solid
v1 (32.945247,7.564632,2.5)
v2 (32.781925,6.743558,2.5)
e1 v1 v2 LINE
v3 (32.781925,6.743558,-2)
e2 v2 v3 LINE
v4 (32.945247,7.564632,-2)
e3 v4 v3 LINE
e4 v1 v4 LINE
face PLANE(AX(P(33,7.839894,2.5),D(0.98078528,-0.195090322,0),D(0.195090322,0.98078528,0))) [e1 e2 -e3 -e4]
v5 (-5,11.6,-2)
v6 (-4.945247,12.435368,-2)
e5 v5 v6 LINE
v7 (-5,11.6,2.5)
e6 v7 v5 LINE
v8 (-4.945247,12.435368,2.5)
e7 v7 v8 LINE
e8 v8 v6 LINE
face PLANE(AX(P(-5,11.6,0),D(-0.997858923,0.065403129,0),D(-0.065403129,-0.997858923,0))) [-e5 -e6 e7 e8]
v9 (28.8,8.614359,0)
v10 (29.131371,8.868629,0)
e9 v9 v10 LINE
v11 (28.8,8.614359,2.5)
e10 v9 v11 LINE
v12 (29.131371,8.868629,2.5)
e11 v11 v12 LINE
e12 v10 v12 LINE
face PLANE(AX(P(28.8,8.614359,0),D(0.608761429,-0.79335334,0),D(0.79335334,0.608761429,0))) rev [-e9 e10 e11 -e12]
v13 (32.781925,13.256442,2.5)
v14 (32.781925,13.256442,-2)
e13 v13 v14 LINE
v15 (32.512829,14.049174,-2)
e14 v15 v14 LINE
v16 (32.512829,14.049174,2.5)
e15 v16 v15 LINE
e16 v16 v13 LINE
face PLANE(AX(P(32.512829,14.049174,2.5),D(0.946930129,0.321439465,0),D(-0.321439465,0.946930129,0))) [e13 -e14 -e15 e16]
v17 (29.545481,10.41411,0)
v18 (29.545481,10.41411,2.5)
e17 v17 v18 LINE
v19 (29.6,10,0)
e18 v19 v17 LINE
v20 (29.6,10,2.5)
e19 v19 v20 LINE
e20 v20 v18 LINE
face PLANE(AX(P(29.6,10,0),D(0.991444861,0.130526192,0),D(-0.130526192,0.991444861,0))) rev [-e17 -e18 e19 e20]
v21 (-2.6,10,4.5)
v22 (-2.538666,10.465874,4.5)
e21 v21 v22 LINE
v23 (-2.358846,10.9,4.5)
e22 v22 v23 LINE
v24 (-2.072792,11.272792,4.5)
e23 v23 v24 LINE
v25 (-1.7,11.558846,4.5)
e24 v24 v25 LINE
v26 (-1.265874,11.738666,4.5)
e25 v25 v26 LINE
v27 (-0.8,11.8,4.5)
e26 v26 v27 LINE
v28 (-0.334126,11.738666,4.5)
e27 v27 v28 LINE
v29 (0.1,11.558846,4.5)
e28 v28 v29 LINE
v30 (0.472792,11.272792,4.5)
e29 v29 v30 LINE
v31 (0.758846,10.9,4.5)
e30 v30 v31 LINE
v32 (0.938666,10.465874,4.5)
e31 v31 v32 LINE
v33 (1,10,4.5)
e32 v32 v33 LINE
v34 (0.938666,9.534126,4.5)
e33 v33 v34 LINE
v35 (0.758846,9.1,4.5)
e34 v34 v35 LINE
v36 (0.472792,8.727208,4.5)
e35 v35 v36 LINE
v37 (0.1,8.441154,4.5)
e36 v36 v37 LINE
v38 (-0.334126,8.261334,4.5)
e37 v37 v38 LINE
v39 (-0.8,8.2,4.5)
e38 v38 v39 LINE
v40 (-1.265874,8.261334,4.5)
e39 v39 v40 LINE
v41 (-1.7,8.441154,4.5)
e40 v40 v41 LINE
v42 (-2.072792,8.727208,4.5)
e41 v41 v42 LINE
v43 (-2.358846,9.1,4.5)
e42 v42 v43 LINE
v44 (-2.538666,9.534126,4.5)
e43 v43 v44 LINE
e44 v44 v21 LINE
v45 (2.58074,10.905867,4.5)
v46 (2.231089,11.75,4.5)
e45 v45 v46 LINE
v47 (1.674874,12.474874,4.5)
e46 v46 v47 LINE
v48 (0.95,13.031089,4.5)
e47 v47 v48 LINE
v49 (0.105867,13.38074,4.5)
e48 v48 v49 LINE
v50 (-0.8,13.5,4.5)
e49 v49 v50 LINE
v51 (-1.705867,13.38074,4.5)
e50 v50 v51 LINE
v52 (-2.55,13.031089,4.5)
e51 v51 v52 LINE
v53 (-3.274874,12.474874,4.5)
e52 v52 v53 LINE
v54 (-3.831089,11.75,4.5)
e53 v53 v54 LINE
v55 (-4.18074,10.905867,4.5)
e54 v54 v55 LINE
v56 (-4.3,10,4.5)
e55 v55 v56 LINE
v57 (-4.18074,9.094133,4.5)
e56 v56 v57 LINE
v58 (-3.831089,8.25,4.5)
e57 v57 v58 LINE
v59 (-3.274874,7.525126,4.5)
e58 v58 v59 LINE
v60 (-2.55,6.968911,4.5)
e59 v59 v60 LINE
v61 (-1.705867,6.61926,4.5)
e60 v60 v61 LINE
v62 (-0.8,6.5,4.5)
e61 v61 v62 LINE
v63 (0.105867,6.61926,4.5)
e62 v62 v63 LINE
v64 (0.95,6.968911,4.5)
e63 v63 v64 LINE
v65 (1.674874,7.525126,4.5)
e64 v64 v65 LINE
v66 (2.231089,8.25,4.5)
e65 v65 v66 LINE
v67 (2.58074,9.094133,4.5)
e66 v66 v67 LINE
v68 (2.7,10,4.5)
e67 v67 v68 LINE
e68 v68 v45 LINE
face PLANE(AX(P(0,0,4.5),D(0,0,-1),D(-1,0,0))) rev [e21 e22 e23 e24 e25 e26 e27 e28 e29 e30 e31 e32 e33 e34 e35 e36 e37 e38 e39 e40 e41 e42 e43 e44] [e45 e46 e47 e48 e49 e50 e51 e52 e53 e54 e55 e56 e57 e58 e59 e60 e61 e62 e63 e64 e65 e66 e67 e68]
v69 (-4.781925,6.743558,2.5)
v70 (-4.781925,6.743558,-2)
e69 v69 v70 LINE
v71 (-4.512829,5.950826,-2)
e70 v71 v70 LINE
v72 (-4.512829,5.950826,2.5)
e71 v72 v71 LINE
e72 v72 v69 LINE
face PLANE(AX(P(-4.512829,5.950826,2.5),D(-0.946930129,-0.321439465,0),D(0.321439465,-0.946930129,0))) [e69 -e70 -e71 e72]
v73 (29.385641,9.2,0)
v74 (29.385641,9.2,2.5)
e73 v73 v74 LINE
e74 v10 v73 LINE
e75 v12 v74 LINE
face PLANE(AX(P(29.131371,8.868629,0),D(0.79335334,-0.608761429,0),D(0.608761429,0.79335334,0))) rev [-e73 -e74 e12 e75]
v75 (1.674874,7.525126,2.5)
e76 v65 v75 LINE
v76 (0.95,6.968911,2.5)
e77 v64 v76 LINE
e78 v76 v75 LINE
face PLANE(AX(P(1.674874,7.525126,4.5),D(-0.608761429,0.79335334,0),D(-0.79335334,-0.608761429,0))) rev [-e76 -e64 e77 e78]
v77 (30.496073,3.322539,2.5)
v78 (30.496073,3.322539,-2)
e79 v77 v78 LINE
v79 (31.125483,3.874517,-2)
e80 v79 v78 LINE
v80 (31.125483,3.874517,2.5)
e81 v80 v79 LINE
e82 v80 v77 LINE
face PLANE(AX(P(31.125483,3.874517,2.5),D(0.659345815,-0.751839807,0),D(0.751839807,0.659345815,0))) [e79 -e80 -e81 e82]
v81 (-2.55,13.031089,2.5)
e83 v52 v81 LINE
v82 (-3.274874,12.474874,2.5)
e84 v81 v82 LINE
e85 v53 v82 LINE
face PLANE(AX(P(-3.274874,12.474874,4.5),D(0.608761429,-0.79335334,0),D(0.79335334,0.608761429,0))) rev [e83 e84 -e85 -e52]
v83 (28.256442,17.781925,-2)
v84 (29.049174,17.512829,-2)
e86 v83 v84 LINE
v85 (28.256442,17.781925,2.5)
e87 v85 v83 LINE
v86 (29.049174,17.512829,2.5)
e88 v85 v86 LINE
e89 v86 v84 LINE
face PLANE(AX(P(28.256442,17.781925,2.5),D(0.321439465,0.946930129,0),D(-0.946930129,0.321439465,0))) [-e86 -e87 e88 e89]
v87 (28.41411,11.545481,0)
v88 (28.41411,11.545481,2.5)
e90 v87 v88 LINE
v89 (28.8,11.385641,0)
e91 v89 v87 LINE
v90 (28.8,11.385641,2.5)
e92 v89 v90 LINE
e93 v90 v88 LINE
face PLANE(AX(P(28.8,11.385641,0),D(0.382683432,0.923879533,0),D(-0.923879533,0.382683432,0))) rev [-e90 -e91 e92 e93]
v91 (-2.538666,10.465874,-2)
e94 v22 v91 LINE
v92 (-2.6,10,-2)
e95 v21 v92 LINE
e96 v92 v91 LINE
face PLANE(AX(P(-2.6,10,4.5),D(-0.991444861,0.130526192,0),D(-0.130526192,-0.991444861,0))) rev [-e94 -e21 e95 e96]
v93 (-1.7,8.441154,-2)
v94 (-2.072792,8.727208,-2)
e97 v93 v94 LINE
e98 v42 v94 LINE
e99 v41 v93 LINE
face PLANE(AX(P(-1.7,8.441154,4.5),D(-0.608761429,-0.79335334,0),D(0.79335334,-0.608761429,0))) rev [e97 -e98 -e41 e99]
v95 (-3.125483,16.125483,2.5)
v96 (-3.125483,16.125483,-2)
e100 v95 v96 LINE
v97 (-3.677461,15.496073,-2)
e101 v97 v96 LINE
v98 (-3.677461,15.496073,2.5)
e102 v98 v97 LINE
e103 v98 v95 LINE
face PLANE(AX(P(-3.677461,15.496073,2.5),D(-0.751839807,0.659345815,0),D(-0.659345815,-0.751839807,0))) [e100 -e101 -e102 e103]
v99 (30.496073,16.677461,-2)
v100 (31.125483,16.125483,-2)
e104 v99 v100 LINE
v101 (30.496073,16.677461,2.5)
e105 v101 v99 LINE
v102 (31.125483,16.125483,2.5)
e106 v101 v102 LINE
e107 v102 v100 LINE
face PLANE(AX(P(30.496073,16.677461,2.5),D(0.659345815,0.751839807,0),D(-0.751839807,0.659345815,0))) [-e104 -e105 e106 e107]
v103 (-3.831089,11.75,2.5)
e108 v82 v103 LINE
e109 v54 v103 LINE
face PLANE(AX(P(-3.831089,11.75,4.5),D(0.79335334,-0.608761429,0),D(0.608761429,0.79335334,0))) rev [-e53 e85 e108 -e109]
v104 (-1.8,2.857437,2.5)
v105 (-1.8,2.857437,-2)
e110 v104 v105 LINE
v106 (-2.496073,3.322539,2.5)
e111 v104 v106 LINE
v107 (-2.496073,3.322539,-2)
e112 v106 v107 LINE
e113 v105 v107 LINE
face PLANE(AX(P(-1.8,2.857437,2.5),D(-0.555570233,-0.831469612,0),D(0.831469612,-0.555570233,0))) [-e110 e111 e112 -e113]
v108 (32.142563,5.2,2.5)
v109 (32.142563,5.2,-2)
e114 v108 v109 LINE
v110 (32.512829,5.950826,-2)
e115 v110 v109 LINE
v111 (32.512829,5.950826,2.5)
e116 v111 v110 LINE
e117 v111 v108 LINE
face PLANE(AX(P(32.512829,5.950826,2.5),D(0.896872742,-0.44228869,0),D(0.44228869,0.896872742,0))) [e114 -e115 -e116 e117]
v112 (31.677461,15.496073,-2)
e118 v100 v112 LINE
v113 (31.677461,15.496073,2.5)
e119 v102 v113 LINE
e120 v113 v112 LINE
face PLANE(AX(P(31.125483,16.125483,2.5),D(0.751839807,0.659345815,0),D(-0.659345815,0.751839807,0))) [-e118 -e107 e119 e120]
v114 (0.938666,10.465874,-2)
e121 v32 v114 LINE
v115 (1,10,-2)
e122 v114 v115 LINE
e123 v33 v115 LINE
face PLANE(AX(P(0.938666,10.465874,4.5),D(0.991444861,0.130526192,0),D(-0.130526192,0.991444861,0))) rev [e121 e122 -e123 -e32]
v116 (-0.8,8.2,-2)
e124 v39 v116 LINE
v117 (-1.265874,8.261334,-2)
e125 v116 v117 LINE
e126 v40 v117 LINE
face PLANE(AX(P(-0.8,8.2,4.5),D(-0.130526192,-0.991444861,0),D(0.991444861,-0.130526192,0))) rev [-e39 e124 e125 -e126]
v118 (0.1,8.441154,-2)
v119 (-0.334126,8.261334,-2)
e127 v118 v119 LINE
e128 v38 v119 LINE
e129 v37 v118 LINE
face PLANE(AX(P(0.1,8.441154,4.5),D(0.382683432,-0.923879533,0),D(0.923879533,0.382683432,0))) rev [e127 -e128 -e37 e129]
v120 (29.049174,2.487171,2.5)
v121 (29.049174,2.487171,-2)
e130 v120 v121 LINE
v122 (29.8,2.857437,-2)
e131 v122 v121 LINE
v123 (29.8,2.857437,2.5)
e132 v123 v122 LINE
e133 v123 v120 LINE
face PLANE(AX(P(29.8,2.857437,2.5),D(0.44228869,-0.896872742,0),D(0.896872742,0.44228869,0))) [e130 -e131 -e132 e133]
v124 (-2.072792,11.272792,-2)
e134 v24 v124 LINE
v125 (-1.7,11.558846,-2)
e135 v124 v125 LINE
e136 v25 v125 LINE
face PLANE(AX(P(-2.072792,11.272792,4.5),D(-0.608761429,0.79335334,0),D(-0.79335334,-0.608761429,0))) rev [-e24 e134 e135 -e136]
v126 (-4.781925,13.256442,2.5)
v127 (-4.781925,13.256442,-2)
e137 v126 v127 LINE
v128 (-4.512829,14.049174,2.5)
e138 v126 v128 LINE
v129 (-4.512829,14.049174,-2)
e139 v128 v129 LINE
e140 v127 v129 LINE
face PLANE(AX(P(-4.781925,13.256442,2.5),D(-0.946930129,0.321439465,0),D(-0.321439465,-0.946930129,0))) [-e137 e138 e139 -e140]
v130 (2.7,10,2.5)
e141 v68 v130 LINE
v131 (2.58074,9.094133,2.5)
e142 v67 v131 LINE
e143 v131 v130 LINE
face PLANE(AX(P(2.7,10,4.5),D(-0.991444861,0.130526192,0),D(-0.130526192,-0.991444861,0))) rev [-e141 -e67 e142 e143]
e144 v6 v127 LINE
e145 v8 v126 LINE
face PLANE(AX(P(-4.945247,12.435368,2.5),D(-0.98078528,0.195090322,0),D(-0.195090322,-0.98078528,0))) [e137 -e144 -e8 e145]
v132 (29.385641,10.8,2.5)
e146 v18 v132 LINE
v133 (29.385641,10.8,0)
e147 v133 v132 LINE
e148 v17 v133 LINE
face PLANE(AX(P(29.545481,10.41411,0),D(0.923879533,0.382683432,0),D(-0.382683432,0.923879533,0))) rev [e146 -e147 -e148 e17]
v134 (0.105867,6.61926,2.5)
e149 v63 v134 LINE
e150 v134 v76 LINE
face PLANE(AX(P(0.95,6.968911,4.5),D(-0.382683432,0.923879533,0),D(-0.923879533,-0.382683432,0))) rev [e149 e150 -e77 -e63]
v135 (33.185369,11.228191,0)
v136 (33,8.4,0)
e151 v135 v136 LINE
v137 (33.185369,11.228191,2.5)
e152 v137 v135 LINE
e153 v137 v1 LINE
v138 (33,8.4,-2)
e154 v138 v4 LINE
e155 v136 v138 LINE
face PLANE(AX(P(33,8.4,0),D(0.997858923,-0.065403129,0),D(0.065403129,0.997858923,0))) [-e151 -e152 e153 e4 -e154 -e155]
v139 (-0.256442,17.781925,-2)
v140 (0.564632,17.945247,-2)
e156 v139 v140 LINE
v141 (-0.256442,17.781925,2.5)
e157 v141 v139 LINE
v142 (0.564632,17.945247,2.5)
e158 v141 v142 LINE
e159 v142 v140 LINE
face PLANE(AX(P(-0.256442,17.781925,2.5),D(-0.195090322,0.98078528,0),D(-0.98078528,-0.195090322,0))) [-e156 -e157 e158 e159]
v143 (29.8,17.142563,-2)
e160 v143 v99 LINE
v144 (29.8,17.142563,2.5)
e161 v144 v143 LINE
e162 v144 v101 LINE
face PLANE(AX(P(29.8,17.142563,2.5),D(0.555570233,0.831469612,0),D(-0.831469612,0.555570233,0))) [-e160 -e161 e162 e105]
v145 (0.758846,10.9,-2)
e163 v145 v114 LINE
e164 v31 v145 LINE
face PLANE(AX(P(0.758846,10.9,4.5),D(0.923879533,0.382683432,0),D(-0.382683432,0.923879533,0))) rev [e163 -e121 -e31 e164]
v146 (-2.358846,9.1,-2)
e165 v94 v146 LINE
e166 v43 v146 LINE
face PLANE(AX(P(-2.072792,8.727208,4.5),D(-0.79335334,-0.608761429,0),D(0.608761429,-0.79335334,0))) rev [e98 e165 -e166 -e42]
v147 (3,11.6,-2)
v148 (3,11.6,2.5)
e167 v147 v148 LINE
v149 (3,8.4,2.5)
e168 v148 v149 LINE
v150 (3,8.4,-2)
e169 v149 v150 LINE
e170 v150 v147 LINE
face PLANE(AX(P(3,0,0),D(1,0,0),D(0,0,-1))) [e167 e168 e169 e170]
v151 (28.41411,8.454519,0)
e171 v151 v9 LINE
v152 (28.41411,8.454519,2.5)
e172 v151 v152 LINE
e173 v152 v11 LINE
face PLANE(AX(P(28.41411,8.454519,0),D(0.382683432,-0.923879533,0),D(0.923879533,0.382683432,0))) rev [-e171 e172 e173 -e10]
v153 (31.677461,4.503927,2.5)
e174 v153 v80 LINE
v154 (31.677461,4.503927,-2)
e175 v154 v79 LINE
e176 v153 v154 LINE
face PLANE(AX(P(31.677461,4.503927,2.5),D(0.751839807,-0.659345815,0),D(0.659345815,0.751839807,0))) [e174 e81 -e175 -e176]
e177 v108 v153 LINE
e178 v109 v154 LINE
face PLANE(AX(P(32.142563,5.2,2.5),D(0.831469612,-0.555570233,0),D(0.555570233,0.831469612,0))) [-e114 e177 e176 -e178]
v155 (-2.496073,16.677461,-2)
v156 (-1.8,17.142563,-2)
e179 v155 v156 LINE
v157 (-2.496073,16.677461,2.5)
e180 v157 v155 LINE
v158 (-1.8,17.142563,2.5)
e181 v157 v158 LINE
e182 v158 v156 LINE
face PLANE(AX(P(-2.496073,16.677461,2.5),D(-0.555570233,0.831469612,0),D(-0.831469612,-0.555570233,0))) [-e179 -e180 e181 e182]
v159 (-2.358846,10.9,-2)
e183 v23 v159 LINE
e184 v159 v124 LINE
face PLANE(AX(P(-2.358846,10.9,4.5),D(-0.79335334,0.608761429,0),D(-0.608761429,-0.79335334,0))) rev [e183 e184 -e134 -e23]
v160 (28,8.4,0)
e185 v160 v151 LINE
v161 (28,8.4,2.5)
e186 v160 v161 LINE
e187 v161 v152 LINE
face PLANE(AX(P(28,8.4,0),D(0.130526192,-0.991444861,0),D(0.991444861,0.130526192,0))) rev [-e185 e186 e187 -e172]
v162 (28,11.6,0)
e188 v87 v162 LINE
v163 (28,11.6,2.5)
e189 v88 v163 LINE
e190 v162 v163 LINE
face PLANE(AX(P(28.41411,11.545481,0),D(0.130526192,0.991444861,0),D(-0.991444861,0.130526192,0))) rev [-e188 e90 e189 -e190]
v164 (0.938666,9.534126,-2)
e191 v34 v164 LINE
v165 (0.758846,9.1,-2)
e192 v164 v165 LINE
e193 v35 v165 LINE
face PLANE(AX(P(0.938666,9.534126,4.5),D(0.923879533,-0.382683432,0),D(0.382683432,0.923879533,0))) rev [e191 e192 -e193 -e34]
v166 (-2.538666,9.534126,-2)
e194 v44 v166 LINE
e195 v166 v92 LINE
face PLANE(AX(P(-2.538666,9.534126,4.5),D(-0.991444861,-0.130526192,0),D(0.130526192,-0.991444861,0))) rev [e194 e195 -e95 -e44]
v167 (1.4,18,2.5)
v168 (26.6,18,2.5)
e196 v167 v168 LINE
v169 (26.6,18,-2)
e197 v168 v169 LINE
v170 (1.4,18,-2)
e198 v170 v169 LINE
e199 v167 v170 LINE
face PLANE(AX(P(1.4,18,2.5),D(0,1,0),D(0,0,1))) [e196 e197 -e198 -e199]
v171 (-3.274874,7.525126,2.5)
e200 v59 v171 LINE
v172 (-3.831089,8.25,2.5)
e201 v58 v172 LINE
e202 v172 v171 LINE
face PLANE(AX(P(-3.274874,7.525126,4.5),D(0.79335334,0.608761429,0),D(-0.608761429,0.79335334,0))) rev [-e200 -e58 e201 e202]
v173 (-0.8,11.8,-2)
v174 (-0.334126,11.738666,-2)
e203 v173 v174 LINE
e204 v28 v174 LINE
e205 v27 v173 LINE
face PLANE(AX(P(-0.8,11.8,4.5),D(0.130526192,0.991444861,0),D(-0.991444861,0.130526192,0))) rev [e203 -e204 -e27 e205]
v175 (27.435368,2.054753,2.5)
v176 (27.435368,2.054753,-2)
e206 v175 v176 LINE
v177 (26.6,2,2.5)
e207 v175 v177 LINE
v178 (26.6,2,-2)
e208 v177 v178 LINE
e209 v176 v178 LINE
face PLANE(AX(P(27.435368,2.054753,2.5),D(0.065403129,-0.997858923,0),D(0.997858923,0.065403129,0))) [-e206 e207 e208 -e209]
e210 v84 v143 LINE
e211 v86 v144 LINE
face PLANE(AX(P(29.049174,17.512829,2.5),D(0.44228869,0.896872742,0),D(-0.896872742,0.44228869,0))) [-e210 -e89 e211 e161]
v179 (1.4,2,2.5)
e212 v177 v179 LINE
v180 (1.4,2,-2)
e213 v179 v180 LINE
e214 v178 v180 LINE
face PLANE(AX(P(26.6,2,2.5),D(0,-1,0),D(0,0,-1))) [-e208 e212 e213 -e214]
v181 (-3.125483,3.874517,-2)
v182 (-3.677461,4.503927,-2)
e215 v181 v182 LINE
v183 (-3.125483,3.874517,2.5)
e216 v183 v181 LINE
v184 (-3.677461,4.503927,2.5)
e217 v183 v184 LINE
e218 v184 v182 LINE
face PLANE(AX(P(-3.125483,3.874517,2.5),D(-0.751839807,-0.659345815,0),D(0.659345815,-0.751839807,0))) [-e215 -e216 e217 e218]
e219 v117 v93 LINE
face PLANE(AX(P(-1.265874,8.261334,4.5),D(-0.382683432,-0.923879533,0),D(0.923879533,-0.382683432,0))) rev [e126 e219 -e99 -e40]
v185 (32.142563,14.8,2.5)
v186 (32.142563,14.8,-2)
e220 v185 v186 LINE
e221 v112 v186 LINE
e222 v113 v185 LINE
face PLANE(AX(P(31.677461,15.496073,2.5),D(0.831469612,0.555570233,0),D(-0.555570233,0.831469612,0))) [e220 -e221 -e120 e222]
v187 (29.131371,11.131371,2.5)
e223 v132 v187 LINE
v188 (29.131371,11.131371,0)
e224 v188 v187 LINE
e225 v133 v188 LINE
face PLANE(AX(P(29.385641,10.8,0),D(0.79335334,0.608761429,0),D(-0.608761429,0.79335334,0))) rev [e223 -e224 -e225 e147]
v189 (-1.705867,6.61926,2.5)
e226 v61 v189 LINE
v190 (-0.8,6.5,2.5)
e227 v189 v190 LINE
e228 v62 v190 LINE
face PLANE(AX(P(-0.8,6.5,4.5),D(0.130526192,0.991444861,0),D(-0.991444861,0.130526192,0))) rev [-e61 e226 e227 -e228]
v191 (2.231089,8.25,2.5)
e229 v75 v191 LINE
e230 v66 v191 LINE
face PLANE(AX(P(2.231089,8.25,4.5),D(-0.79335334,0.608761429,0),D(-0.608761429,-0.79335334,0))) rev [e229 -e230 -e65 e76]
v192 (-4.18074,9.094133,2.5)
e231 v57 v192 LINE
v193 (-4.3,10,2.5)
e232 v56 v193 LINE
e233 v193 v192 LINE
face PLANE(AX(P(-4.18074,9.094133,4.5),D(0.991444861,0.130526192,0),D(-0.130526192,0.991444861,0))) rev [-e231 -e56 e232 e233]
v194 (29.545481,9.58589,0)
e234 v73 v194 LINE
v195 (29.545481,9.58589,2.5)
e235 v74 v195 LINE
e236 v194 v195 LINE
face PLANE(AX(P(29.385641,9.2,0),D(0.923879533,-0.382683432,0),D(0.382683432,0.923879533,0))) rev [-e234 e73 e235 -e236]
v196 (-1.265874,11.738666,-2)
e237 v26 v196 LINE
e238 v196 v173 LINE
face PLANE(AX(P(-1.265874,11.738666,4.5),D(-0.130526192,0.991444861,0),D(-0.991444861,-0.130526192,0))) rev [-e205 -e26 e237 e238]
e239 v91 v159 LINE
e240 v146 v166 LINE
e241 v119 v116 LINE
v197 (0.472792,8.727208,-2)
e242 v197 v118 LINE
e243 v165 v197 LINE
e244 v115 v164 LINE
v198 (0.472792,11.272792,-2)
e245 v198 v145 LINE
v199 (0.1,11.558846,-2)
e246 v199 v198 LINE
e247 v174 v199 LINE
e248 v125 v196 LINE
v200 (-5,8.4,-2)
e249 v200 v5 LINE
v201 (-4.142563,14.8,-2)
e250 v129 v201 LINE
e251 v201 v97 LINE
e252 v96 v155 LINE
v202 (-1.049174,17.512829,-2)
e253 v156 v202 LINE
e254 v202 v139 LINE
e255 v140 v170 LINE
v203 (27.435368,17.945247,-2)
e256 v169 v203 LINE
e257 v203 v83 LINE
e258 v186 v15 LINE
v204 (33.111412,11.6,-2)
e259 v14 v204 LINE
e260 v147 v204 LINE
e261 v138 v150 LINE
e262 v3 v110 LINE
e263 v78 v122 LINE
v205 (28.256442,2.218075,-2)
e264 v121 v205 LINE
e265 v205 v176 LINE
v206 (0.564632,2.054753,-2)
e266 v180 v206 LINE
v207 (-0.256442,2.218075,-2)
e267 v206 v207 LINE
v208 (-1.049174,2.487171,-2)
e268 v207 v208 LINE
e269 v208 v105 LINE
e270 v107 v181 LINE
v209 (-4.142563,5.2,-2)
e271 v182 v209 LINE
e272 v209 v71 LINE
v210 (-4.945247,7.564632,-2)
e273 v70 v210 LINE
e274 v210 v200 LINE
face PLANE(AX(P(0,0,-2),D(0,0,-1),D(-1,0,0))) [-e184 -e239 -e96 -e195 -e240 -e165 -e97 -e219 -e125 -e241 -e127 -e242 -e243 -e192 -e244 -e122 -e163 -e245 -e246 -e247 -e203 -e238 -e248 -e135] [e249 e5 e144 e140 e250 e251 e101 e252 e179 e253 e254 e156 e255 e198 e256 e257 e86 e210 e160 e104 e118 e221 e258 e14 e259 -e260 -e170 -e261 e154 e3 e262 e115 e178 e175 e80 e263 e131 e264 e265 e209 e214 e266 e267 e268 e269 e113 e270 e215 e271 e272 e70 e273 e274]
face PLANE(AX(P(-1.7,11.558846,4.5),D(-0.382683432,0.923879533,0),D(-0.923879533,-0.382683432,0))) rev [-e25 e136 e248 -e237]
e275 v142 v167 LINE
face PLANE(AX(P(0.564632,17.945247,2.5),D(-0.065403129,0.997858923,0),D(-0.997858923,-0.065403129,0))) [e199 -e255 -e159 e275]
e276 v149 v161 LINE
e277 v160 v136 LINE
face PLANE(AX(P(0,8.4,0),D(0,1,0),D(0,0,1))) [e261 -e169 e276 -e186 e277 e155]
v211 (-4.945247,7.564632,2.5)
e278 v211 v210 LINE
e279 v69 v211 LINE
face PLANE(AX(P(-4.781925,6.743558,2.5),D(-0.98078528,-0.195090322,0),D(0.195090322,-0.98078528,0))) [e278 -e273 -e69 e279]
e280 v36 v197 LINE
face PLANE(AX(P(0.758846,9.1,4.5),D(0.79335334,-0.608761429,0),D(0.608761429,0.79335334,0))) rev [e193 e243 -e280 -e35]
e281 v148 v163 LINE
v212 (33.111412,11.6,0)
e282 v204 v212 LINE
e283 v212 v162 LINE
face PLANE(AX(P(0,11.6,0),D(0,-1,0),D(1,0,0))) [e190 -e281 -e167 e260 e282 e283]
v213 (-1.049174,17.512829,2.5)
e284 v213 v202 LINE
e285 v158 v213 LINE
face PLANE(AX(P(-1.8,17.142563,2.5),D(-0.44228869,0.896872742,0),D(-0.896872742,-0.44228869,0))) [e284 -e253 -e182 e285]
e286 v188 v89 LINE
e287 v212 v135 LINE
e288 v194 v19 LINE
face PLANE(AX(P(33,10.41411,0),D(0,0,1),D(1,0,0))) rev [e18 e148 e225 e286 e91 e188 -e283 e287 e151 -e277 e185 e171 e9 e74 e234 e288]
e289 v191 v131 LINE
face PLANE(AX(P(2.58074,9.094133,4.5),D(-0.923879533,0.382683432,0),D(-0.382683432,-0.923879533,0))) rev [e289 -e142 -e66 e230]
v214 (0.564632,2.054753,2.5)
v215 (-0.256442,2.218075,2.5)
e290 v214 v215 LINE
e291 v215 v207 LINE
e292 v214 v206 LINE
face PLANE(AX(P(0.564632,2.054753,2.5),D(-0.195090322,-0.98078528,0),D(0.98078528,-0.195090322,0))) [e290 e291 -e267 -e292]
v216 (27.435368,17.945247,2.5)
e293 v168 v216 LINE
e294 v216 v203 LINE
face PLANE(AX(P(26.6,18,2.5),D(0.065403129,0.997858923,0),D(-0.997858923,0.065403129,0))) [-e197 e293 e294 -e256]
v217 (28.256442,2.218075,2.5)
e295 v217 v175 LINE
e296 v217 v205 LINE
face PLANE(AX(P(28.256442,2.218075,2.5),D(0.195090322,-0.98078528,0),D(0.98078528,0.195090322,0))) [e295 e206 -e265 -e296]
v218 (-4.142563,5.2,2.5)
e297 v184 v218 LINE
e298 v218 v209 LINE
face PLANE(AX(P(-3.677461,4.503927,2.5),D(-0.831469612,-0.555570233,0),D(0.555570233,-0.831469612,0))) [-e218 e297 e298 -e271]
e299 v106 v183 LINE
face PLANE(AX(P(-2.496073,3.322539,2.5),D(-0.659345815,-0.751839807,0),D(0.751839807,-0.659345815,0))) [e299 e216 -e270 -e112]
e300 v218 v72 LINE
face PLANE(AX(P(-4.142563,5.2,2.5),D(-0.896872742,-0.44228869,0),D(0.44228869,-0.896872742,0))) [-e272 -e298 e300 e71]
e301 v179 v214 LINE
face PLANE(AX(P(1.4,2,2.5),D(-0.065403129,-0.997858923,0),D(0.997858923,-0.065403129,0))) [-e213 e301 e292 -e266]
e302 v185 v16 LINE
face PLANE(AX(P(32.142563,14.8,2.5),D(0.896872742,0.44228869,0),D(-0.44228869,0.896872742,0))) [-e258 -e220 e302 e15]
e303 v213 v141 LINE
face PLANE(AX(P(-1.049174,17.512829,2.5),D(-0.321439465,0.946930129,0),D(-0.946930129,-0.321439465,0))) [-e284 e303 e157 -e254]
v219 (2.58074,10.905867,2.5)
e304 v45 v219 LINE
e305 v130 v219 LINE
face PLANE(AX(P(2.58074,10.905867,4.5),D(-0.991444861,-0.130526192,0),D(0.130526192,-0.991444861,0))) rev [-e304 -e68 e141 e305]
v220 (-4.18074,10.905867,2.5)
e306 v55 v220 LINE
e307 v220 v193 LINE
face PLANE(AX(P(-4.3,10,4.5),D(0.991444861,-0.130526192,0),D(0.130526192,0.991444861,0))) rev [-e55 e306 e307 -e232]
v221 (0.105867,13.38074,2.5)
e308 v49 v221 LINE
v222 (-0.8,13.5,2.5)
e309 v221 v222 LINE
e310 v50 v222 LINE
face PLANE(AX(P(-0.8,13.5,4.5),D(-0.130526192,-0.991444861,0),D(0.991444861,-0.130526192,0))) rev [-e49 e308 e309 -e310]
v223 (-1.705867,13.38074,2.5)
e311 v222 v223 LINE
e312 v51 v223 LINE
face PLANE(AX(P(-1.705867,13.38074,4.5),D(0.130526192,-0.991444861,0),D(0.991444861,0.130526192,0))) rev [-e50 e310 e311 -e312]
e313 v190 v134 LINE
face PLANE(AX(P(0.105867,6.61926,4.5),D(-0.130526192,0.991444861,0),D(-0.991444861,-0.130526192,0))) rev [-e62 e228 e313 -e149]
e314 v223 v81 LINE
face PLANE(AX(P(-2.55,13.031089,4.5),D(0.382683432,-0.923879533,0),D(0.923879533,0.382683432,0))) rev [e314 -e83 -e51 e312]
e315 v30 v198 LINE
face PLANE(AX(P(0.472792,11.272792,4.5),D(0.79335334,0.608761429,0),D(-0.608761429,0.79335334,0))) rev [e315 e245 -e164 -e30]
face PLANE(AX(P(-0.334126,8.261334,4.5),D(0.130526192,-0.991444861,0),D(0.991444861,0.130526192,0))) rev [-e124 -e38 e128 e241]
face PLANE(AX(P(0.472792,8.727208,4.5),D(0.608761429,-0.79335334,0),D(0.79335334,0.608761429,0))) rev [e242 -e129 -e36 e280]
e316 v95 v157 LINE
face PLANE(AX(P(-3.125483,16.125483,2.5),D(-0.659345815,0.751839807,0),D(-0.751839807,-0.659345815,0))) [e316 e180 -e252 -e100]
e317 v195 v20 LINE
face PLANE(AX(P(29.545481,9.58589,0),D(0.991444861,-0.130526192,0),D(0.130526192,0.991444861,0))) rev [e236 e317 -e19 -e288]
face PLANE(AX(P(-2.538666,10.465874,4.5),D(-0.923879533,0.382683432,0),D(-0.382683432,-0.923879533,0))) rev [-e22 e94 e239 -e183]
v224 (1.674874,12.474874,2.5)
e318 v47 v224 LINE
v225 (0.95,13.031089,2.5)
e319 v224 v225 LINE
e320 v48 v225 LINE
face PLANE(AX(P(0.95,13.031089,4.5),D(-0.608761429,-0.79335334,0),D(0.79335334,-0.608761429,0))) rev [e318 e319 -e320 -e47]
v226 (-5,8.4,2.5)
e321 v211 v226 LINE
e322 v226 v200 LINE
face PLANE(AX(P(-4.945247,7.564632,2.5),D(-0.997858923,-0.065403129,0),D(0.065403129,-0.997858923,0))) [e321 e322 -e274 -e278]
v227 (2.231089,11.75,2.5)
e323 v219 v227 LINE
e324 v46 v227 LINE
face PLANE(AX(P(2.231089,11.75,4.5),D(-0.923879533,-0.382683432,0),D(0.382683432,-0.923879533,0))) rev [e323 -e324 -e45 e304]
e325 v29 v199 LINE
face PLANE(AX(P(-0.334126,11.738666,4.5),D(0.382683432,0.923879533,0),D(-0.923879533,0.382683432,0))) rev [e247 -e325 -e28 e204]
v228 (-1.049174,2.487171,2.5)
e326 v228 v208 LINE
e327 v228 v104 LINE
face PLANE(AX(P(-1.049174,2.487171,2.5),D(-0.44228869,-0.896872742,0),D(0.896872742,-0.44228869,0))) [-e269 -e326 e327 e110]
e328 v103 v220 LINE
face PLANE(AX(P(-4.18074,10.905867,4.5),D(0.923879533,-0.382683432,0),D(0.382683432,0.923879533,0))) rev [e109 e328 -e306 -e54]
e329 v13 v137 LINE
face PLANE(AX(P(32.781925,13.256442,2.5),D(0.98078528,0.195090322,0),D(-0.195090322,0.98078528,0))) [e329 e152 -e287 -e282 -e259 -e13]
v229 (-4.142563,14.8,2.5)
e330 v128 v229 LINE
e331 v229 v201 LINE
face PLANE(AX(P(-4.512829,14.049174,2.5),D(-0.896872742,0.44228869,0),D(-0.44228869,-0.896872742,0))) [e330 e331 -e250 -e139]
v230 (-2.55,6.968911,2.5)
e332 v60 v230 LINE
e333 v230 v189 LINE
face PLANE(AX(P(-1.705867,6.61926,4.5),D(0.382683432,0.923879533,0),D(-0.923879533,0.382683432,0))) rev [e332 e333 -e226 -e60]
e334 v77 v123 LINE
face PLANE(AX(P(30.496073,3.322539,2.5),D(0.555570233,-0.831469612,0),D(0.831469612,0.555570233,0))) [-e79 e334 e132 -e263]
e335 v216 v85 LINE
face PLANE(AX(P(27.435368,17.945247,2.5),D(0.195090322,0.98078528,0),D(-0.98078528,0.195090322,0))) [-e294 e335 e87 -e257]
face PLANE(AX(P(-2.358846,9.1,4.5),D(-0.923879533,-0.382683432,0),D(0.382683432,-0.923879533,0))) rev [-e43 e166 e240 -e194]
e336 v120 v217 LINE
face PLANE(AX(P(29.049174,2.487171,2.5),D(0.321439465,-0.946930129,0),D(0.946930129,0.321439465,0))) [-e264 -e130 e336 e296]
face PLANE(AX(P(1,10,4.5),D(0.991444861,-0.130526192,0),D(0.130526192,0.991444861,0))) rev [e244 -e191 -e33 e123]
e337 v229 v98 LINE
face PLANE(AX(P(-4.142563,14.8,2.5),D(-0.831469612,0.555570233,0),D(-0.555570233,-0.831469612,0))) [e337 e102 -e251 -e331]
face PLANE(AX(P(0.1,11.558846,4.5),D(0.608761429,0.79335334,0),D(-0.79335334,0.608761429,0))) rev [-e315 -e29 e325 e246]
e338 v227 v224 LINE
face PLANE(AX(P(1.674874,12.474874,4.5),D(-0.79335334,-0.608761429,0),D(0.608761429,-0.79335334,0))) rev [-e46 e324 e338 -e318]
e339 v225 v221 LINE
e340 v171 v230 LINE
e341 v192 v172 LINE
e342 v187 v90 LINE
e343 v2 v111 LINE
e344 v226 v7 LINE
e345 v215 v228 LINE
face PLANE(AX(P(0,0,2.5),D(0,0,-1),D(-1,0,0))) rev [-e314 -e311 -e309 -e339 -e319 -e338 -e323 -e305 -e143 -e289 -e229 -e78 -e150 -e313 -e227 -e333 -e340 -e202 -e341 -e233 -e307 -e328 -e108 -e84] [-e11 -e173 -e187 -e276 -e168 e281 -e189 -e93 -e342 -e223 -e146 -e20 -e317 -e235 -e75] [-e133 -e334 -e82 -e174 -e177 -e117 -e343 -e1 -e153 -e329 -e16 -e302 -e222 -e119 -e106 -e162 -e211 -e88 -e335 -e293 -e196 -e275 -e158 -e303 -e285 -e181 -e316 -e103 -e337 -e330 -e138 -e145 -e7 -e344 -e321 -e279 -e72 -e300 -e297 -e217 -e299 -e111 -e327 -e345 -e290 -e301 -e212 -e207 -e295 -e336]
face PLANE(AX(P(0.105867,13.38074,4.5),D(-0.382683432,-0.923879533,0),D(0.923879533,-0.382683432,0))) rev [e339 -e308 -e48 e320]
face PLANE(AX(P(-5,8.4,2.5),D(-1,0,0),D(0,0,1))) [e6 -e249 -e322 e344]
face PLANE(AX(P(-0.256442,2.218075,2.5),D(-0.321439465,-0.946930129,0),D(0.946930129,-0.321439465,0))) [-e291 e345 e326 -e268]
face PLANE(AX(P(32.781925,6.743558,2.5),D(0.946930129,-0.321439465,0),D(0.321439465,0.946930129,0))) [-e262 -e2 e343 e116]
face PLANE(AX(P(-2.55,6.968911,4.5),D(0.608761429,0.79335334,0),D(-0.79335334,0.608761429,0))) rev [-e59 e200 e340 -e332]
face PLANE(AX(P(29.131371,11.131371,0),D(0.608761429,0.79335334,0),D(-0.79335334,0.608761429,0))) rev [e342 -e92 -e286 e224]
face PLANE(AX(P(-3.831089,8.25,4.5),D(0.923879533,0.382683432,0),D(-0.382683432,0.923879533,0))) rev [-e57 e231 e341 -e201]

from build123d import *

# Parameters (mm, degrees)
BOSS_EXTRUDE1_DEPTH = 4.5
CUT_EXTRUDE1_DEPTH  = 2.5
CUT_EXTRUDE2_DEPTH  = 0.414110472
CUT_EXTRUDE3_DEPTH  = 0.414110472
CUT_EXTRUDE4_DEPTH  = 0.385889528
CUT_EXTRUDE5_DEPTH  = 0.385889528
CUT_EXTRUDE6_DEPTH  = 0.33137085
CUT_EXTRUDE7_DEPTH  = 0.33137085
CUT_EXTRUDE8_DEPTH  = 0.254269796
SKETCH10_W          = 5
SKETCH10_H          = 2
CUT_EXTRUDE9_DEPTH  = 0.214359354
CUT_EXTRUDE10_DEPTH = 0.254269796
SKETCH12_W          = 5
SKETCH12_H          = 2
CUT_EXTRUDE11_DEPTH = 0.214359354
SKETCH13_W          = 4.5
SKETCH13_H          = 3.2
CUT_EXTRUDE12_DEPTH = 25
BOSS_EXTRUDE2_DEPTH = 2
CUT_EXTRUDE13_DEPTH = 39.14773912
DRAFT1_START        = -2
DRAFT1_DEPTH        = 4.5
DRAFT1_2_DEPTH      = 2.5
DRAFT1_3_DEPTH      = 2


# Read off the part's stored shape, not the designer's step: Draft1
with BuildPart() as part:
    # Sketch1 → Boss-Extrude1 (new body)
    with BuildSketch(Plane(origin=(0, 0, -2), x_dir=(-1, 0, 0), z_dir=(0, 0, -1))):
        Polygon((-33, 12.160106278), (-33, 7.839893722), (-32.781925288, 6.743558111), (-32.512829008, 5.950826033), (-32.142562584, 5.2), (-31.677461378, 4.503926854), (-31.1254834, 3.8745166), (-30.496073146, 3.322538622), (-29.8, 2.857437416), (-29.049173967, 2.487170992), (-28.256441889, 2.218074712), (-27.43536763, 2.054752887), (-26.6, 2), (-1.4, 2), (-0.56463237, 2.054752887), (0.256441889, 2.218074712), (1.049173967, 2.487170992), (1.8, 2.857437416), (2.496073146, 3.322538622), (3.1254834, 3.8745166), (3.677461378, 4.503926854), (4.142562584, 5.2), (4.512829008, 5.950826033), (4.781925288, 6.743558111), (4.945247113, 7.56463237), (5, 8.4), (5, 11.6), (4.945247113, 12.43536763), (4.781925288, 13.256441889), (4.512829008, 14.049173967), (4.142562584, 14.8), (3.677461378, 15.496073146), (3.1254834, 16.1254834), (2.496073146, 16.677461378), (1.8, 17.142562584), (1.049173967, 17.512829008), (0.256441889, 17.781925288), (-0.56463237, 17.945247113), (-1.4, 18), (-26.6, 18), (-27.43536763, 17.945247113), (-28.256441889, 17.781925288), (-29.049173967, 17.512829008), (-29.8, 17.142562584), (-30.496073146, 16.677461378), (-31.1254834, 16.1254834), (-31.677461378, 15.496073146), (-32.142562584, 14.8), (-32.512829008, 14.049173967), (-32.781925288, 13.256441889), align=None)
    extrude(amount=-BOSS_EXTRUDE1_DEPTH)

    # Sketch2 → Cut-Extrude1 (cut)
    with BuildSketch(Plane.XY.offset(2.5)):
        Polygon((29.6, 10), (29.545481322, 10.414110472), (29.385640646, 10.8), (29.13137085, 11.13137085), (28.8, 11.385640646), (28.414110472, 11.545481322), (28, 11.6), (28, 8.4), (28.414110472, 8.454518678), (28.8, 8.614359354), (29.13137085, 8.86862915), (29.385640646, 9.2), (29.545481322, 9.585889528), align=None)
    extrude(amount=-CUT_EXTRUDE1_DEPTH, mode=Mode.SUBTRACT)

    # Sketch3 → Cut-Extrude2 (cut)
    with BuildSketch(Plane.XZ.offset(-10)):
        Polygon((28, 0), (28, -2), (33, -2), (33, 0), (29.545481322, 0), align=None)
    extrude(amount=-CUT_EXTRUDE2_DEPTH, mode=Mode.SUBTRACT)

    # Sketch4 → Cut-Extrude3 (cut)
    with BuildSketch(Plane(origin=(0, 10, 0), x_dir=(-1, 0, 0), z_dir=(0, 1, 0))):
        Polygon((-28, -2), (-28, 0), (-29.545481322, 0), (-33, 0), (-33, -2), align=None)
    extrude(amount=-CUT_EXTRUDE3_DEPTH, mode=Mode.SUBTRACT)

    # Sketch5 → Cut-Extrude4 (cut)
    with BuildSketch(Plane.XZ.offset(-10.414110472)):
        Polygon((28, 0), (28, -2), (33, -2), (33, 0), (29.385640646, 0), align=None)
    extrude(amount=-CUT_EXTRUDE4_DEPTH, mode=Mode.SUBTRACT)

    # Sketch6 → Cut-Extrude5 (cut)
    with BuildSketch(Plane(origin=(0, 9.585889528, 0), x_dir=(-1, 0, 0), z_dir=(0, 1, 0))):
        Polygon((-28, -2), (-28, 0), (-29.385640646, 0), (-33, 0), (-33, -2), align=None)
    extrude(amount=-CUT_EXTRUDE5_DEPTH, mode=Mode.SUBTRACT)

    # Sketch7 → Cut-Extrude6 (cut)
    with BuildSketch(Plane.XZ.offset(-10.8)):
        Polygon((28, 0), (28, -2), (33, -2), (33, 0), (29.13137085, 0), align=None)
    extrude(amount=-CUT_EXTRUDE6_DEPTH, mode=Mode.SUBTRACT)

    # Sketch8 → Cut-Extrude7 (cut)
    with BuildSketch(Plane(origin=(0, 9.2, 0), x_dir=(-1, 0, 0), z_dir=(0, 1, 0))):
        Polygon((-28, -2), (-28, 0), (-29.13137085, 0), (-33, 0), (-33, -2), align=None)
    extrude(amount=-CUT_EXTRUDE7_DEPTH, mode=Mode.SUBTRACT)

    # Sketch9 → Cut-Extrude8 (cut)
    with BuildSketch(Plane.XZ.offset(-11.13137085)):
        Polygon((28, 0), (28, -2), (33, -2), (33, 0), (28.8, 0), align=None)
    extrude(amount=-CUT_EXTRUDE8_DEPTH, mode=Mode.SUBTRACT)

    # Sketch10 → Cut-Extrude9 (cut)
    with BuildSketch(Plane.XZ.offset(-11.385640646)):
        with Locations((30.5, -1)):
            Rectangle(SKETCH10_W, SKETCH10_H)
    extrude(amount=-CUT_EXTRUDE9_DEPTH, mode=Mode.SUBTRACT)

    # Sketch11 → Cut-Extrude10 (cut)
    with BuildSketch(Plane(origin=(0, 8.86862915, 0), x_dir=(-1, 0, 0), z_dir=(0, 1, 0))):
        Polygon((-28, -2), (-28, 0), (-28.8, 0), (-33, 0), (-33, -2), align=None)
    extrude(amount=-CUT_EXTRUDE10_DEPTH, mode=Mode.SUBTRACT)

    # Sketch12 → Cut-Extrude11 (cut)
    with BuildSketch(Plane(origin=(0, 8.614359354, 0), x_dir=(-1, 0, 0), z_dir=(0, 1, 0))):
        with Locations((-30.5, -1)):
            Rectangle(SKETCH12_W, SKETCH12_H)
    extrude(amount=-CUT_EXTRUDE11_DEPTH, mode=Mode.SUBTRACT)

    # Sketch13 → Cut-Extrude12 (cut)
    with BuildSketch(Plane(origin=(28, 0, 0), x_dir=(0, 0, -1), z_dir=(1, 0, 0))):
        with Locations((-0.25, 10)):
            Rectangle(SKETCH13_W, SKETCH13_H)
    extrude(amount=-CUT_EXTRUDE12_DEPTH, mode=Mode.SUBTRACT)

    # Sketch14 → Boss-Extrude2 (add)
    with BuildSketch(Plane.XY.offset(2.5)):
        Polygon((1.674873734, 12.474873734), (2.231088913, 11.75), (2.580740392, 10.905866658), (2.7, 10), (2.580740392, 9.094133342), (2.231088913, 8.25), (1.674873734, 7.525126266), (0.95, 6.968911087), (0.105866658, 6.619259608), (-0.8, 6.5), (-1.705866658, 6.619259608), (-2.55, 6.968911087), (-3.274873734, 7.525126266), (-3.831088913, 8.25), (-4.180740392, 9.094133342), (-4.3, 10), (-4.180740392, 10.905866658), (-3.831088913, 11.75), (-3.274873734, 12.474873734), (-2.55, 13.031088913), (-1.705866658, 13.380740392), (-0.8, 13.5), (0.105866658, 13.380740392), (0.95, 13.031088913), align=None)
    extrude(amount=BOSS_EXTRUDE2_DEPTH)

    # Sketch15 → Cut-Extrude13 (cut, through all)
    with BuildSketch(Plane(origin=(0, 0, -2), x_dir=(-1, 0, 0), z_dir=(0, 0, -1))):
        Polygon((-0.938666487, 9.534125719), (-0.758845727, 9.1), (-0.472792206, 8.727207794), (-0.1, 8.441154273), (0.334125719, 8.261333513), (0.8, 8.2), (1.265874281, 8.261333513), (1.7, 8.441154273), (2.072792206, 8.727207794), (2.358845727, 9.1), (2.538666487, 9.534125719), (2.6, 10), (2.538666487, 10.465874281), (2.358845727, 10.9), (2.072792206, 11.272792206), (1.7, 11.558845727), (1.265874281, 11.738666487), (0.8, 11.8), (0.334125719, 11.738666487), (-0.1, 11.558845727), (-0.472792206, 11.272792206), (-0.758845727, 10.9), (-0.938666487, 10.465874281), (-1, 10), align=None)
    extrude(amount=-CUT_EXTRUDE13_DEPTH, mode=Mode.SUBTRACT)

    # Draft1 outline → Draft1 (cut)
    with BuildSketch(Plane.XY.offset(DRAFT1_START)):
        Polygon((33, 8.399999998), (32.945247113, 7.56463237), (33, 7.839893722), align=None)
    extrude(amount=DRAFT1_DEPTH, mode=Mode.SUBTRACT)

    # Draft1 2 outline → Draft1 2 (add)
    with BuildSketch(Plane.XY):
        Polygon((33, 8.399999998), (33.185369442, 11.228191161), (33, 12.160106278), align=None)
    extrude(amount=DRAFT1_2_DEPTH)

    # Draft1 3 outline → Draft1 3 (add)
    with BuildSketch(Plane.XY.offset(DRAFT1_START)):
        Polygon((33, 12.160106278), (33, 11.6), (33.111412066, 11.6), align=None)
    extrude(amount=DRAFT1_3_DEPTH)


solid = part.part
